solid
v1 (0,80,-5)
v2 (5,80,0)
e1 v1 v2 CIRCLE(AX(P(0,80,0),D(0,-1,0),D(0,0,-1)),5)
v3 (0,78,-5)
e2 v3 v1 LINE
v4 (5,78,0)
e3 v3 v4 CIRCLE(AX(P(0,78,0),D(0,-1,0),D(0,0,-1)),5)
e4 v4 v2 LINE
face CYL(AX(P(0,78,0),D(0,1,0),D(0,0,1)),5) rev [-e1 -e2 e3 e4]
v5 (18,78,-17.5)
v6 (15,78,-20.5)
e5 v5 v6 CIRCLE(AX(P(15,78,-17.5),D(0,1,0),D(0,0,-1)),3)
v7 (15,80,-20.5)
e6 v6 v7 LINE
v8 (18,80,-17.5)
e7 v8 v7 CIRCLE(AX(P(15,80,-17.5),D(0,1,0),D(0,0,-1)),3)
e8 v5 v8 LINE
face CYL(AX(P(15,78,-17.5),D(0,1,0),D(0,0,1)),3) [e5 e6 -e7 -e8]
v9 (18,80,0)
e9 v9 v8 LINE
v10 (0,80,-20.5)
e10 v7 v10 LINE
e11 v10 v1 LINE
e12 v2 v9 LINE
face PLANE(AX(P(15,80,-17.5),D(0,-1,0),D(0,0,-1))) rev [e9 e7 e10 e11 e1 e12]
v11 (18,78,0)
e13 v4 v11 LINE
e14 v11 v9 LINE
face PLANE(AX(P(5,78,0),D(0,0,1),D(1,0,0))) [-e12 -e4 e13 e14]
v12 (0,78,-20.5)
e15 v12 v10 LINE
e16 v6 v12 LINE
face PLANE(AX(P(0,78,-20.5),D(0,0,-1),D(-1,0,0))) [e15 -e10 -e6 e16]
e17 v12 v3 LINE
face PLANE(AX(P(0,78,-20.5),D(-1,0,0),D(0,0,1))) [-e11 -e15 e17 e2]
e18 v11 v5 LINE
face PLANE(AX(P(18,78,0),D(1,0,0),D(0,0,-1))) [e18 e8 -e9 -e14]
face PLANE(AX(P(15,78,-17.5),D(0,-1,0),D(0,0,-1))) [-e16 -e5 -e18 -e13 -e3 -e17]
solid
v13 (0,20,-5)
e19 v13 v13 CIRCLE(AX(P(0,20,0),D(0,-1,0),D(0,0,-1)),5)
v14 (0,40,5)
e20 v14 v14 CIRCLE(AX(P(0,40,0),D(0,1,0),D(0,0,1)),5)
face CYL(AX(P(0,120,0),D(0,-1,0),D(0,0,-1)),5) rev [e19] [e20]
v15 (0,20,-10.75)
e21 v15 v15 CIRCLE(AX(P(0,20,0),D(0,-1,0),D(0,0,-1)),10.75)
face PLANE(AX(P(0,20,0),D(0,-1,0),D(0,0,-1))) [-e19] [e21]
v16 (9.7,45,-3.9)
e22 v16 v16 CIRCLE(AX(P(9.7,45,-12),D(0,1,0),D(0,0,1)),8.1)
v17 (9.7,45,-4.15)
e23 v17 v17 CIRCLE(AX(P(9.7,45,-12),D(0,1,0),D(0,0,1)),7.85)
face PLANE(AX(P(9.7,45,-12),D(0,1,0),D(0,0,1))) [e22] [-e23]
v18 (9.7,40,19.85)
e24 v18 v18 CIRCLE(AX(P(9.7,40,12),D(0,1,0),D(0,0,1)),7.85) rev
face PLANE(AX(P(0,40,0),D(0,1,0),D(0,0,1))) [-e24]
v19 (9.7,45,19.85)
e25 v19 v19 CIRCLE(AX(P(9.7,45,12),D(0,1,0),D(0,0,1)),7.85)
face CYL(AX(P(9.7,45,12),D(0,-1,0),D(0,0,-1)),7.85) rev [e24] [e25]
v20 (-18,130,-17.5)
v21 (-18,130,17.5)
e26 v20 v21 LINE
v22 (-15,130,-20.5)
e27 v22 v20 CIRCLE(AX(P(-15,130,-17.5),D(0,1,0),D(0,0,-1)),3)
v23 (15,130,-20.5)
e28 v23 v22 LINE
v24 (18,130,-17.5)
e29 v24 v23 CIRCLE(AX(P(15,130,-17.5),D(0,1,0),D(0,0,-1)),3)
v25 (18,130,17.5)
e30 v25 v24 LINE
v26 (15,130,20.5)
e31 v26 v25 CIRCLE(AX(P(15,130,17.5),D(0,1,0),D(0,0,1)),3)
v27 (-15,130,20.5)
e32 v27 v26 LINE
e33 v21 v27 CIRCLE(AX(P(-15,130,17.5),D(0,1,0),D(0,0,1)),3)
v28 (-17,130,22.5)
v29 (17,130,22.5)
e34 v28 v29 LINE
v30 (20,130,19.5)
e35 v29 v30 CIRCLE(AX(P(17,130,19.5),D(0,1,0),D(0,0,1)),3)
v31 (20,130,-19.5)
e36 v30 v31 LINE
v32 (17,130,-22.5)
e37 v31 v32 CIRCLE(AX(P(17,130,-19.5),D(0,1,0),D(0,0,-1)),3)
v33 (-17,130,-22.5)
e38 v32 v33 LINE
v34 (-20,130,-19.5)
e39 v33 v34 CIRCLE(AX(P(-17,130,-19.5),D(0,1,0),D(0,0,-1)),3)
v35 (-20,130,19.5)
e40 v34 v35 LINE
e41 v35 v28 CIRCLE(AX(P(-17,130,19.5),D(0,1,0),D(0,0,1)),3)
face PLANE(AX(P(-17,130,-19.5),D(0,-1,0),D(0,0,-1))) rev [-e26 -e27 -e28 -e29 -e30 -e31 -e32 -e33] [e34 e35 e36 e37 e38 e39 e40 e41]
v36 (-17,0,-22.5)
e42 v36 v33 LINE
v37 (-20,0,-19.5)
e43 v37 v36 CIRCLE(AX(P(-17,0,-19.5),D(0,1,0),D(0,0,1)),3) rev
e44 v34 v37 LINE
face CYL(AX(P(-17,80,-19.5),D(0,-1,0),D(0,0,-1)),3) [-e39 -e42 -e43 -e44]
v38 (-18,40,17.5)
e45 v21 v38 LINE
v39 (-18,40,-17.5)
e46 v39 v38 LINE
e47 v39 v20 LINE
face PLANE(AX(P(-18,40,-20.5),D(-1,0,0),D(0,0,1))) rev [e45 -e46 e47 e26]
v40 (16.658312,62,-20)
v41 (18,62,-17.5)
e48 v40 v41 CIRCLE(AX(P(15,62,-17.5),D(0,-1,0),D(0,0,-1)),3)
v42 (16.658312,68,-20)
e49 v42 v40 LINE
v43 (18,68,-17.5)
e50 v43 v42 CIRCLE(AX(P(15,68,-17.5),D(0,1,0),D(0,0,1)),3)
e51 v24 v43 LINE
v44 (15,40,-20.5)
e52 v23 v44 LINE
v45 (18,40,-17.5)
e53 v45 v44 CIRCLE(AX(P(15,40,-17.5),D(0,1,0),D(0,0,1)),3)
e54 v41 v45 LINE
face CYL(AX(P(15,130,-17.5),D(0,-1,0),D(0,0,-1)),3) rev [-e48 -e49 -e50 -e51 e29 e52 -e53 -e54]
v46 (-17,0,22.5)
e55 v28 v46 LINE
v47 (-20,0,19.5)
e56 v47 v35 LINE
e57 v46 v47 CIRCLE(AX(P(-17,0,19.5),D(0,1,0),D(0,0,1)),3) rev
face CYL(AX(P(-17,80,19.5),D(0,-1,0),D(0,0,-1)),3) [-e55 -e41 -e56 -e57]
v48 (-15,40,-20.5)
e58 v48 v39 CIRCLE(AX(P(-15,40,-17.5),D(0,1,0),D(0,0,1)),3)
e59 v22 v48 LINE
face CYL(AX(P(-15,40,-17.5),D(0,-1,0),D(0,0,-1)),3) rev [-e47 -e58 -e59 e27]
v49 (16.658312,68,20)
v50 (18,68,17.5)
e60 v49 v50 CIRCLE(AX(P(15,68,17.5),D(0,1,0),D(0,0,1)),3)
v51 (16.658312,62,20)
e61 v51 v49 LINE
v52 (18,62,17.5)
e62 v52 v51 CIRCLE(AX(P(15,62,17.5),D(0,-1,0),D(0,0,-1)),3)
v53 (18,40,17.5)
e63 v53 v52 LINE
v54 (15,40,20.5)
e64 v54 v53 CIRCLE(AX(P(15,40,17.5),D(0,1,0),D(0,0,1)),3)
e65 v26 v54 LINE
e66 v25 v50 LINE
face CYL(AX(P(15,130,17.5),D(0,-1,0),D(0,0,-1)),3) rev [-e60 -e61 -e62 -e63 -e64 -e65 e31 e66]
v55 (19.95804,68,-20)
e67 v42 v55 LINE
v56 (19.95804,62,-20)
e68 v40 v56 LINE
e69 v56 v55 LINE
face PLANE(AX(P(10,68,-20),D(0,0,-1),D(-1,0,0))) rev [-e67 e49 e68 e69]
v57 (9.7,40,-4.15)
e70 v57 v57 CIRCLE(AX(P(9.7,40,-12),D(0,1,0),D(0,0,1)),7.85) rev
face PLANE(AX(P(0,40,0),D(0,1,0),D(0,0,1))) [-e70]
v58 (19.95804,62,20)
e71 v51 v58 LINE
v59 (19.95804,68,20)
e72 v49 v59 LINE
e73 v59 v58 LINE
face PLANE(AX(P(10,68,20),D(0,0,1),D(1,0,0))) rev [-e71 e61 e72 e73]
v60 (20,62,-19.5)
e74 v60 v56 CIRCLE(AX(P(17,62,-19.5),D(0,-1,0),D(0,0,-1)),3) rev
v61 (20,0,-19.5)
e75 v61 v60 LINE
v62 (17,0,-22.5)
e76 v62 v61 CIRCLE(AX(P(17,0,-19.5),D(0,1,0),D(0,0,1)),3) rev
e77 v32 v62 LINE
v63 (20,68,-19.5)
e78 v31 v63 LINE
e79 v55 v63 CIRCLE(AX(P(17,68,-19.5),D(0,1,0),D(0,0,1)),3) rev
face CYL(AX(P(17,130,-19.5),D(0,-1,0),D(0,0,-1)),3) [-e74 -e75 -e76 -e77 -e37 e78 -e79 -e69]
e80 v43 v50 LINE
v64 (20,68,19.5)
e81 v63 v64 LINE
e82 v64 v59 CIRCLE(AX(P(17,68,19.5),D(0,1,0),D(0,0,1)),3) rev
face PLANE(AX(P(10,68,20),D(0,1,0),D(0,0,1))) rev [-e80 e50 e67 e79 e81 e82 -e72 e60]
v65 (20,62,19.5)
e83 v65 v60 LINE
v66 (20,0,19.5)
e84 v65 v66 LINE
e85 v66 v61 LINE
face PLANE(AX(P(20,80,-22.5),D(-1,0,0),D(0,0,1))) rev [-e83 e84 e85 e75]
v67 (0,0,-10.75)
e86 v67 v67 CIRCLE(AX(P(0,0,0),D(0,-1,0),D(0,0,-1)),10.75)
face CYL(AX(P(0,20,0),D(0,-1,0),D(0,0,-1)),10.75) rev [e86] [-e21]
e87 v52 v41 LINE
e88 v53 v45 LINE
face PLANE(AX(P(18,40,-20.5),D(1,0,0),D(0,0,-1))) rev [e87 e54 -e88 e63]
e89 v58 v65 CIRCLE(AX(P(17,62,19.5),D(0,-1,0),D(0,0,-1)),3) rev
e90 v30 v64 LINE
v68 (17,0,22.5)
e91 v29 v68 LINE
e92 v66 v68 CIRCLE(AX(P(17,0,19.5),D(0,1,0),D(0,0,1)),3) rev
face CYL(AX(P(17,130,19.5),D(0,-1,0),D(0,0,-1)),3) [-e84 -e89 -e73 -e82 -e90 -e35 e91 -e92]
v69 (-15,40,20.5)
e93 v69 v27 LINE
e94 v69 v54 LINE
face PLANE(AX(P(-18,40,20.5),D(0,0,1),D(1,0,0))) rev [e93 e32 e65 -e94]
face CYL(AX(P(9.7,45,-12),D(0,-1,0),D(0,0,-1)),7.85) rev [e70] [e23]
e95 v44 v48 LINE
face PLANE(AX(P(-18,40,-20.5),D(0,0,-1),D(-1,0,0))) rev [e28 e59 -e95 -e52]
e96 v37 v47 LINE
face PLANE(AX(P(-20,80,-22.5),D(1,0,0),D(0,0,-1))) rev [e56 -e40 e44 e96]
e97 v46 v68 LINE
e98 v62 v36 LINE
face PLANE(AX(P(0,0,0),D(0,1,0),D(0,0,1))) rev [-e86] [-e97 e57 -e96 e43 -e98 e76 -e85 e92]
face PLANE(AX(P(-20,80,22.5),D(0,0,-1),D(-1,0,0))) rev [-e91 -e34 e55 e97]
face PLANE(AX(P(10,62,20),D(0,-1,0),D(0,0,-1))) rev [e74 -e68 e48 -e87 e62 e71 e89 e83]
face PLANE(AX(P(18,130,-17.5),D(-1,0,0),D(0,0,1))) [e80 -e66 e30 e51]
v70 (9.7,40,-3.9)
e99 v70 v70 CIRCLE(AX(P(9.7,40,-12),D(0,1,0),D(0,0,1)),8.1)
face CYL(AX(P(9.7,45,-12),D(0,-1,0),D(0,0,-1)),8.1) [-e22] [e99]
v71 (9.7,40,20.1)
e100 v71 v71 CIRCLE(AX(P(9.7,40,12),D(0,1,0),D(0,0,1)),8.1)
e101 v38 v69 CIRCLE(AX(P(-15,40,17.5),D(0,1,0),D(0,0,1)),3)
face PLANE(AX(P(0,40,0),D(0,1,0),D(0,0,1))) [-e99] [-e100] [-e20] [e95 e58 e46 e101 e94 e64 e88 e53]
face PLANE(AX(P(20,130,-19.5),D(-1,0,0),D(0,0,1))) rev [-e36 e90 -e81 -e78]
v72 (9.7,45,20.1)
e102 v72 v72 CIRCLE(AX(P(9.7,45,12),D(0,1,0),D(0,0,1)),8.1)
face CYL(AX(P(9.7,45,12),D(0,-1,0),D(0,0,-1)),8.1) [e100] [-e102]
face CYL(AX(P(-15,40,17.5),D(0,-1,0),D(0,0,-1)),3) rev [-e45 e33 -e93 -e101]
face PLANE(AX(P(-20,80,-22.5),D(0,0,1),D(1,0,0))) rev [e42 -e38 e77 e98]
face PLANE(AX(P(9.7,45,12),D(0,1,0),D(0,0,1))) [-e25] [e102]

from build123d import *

# Parameters (mm, degrees)
SKETCH2_W              = 40
SKETCH2_H              = 45
BOSS_EXTRUDE1_DEPTH    = 80
SKETCH3_R              = 10.75
CUT_EXTRUDE1_DEPTH     = 20
SKETCH5_W              = 36
SKETCH5_H              = 41
CUT_EXTRUDE2_DEPTH     = 40
SKETCH6_R              = 5
CUT_EXTRUDE3_DEPTH     = 100
SKETCH7_W              = 40
SKETCH7_H              = 6
CUT_EXTRUDE4_DEPTH     = 10
FILLET1_R              = 3
FILLET2_R              = 3
FILLET3_R              = 3
FILLET4_R              = 3
FILLET5_R              = 3
FILLET6_R              = 3
SPLIT1_SURFACE_1_BACK  = 101.125
SPLIT1_SURFACE_1_DEPTH = 202.25
SPLIT1_SURFACE_2_BACK  = 101.125
SPLIT1_SURFACE_2_DEPTH = 202.25
SKETCH10_R             = 8.1
SKETCH10_R_2           = 7.85
BOSS_EXTRUDE2_DEPTH    = 5
BOSS_EXTRUDE6_DEPTH    = 2
BOSS_EXTRUDE3_DEPTH    = 50


with BuildPart() as part:
    # Sketch2 → Boss-Extrude1 (new body)
    with BuildSketch(Plane(origin=(0, 0, 0), x_dir=(1, 0, 0), z_dir=(0, 1, 0))):
        Rectangle(SKETCH2_W, SKETCH2_H)
    extrude(amount=BOSS_EXTRUDE1_DEPTH)

    # Sketch3 → Cut-Extrude1 (cut)
    with BuildSketch(Plane.XZ):
        with Locations(Location((0, 0, 0), (0, 0, 270))):
            Circle(SKETCH3_R)
    extrude(amount=-CUT_EXTRUDE1_DEPTH, mode=Mode.SUBTRACT)

    # Sketch5 → Cut-Extrude2 (cut)
    with BuildSketch(Plane(origin=(0, 80, 0), x_dir=(1, 0, 0), z_dir=(0, 1, 0))):
        Rectangle(SKETCH5_W, SKETCH5_H)
    extrude(amount=-CUT_EXTRUDE2_DEPTH, mode=Mode.SUBTRACT)

    # Sketch6 → Cut-Extrude3 (cut)
    with BuildSketch(Plane.XZ.offset(-20)):
        with Locations(Location((0, 0, 0), (0, 0, 270))):
            Circle(SKETCH6_R)
    extrude(amount=-CUT_EXTRUDE3_DEPTH, mode=Mode.SUBTRACT)

    # Sketch7 → Cut-Extrude4 (cut)
    with BuildSketch(Plane(origin=(20, 0, 0), x_dir=(0, 0, -1), z_dir=(1, 0, 0))):
        with Locations((0, 65)):
            Rectangle(SKETCH7_W, SKETCH7_H)
    extrude(amount=-CUT_EXTRUDE4_DEPTH, mode=Mode.SUBTRACT)

    # Fillet1
    # the kernel refuses this fillet: 3 mm, written as the material it takes off along each edge
    with BuildSketch(Plane(origin=(20, -7.5, 22.5), x_dir=(0, 0, -1), z_dir=(0, 1, 0)), Plane(origin=(20, -7.5, -22.5), x_dir=(-1, 0, 0), z_dir=(0, 1, 0))) as fillet1_piece_1:
        with BuildLine():
            CenterArc((FILLET1_R, FILLET1_R), FILLET1_R, 180, 90)
            Line((0, FILLET1_R), (0, 0))
            Line((0, 0), (FILLET1_R, 0))
        make_face()
    extrude(amount=95, mode=Mode.SUBTRACT)

    # Fillet2
    fillet2_edges = [part.edges().sort_by_distance(p)[0] for p in [
        (-20, 40, 22.5),
        (-20, 40, -22.5),
    ]]
    fillet(fillet2_edges, radius=FILLET2_R)

    # Fillet3
    fillet3_edges = [part.edges().sort_by_distance(p)[0] for p in [
        (-18, 60, -20.5),
    ]]
    fillet(fillet3_edges, radius=FILLET3_R)

    # Fillet4
    # the kernel refuses this fillet: 3 mm, written as the material it adds along each edge
    with BuildSketch(Plane(origin=(18, 80, -20.5), x_dir=(-1, 0, 0), z_dir=(0, -1, 0))) as fillet4_piece_1_section:
        with BuildLine():
            CenterArc((FILLET4_R, -FILLET4_R), FILLET4_R, 90, 90)
            Line((0, -FILLET4_R), (0, 0))
            Line((0, 0), (FILLET4_R, 0))
        make_face()
    fillet4_piece_1 = extrude(amount=47.5, mode=Mode.PRIVATE)
    fillet4_piece_1 = split(fillet4_piece_1, bisect_by=Plane(origin=(17.022641749, 74, -20), z_dir=(0, 0, -1)), keep=Keep.TOP, mode=Mode.PRIVATE)
    add(fillet4_piece_1)
    with BuildSketch(Plane(origin=(18, 80, -20.5), x_dir=(-1, 0, 0), z_dir=(0, -1, 0))) as fillet4_piece_2_section:
        with BuildLine():
            CenterArc((FILLET4_R, -FILLET4_R), FILLET4_R, 90, 90)
            Line((0, -FILLET4_R), (0, 0))
            Line((0, 0), (FILLET4_R, 0))
        make_face()
    fillet4_piece_2 = extrude(amount=47.5, mode=Mode.PRIVATE)
    fillet4_piece_2 = split(fillet4_piece_2, bisect_by=Plane(origin=(17.619593503, 68, -19.406346205), z_dir=(0, 1, 0)), keep=Keep.TOP, mode=Mode.PRIVATE)
    add(fillet4_piece_2)
    with BuildSketch(Plane(origin=(18, 87.5, -20.5), x_dir=(-1, 0, 0), z_dir=(0, -1, 0))) as fillet4_piece_3_section:
        with BuildLine():
            CenterArc((FILLET4_R, -FILLET4_R), FILLET4_R, 90, 90)
            Line((0, -FILLET4_R), (0, 0))
            Line((0, 0), (FILLET4_R, 0))
        make_face()
    fillet4_piece_3 = extrude(amount=55, mode=Mode.PRIVATE)
    fillet4_piece_3 = split(fillet4_piece_3, bisect_by=Plane(origin=(17.619593503, 62, -19.406346205), z_dir=(0, -1, 0)), keep=Keep.TOP, mode=Mode.PRIVATE)
    add(fillet4_piece_3)

    # Fillet5
    fillet5_edges = [part.edges().sort_by_distance(p)[0] for p in [
        (-18, 60, 20.5),
    ]]
    fillet(fillet5_edges, radius=FILLET5_R)

    # Fillet6
    # the kernel refuses this fillet: 3 mm, written as the material it adds along each edge
    with BuildSketch(Plane(origin=(18, 80, 20.5), x_dir=(-1, 0, 0), z_dir=(0, -1, 0))) as fillet6_piece_1_section:
        with BuildLine():
            CenterArc((FILLET6_R, FILLET6_R), FILLET6_R, 180, 90)
            Line((0, FILLET6_R), (0, 0))
            Line((0, 0), (FILLET6_R, 0))
        make_face()
    fillet6_piece_1 = extrude(amount=47.5, mode=Mode.PRIVATE)
    fillet6_piece_1 = split(fillet6_piece_1, bisect_by=Plane(origin=(17.022641749, 74, 20), z_dir=(0, 0, 1)), keep=Keep.TOP, mode=Mode.PRIVATE)
    add(fillet6_piece_1)
    with BuildSketch(Plane(origin=(18, 80, 20.5), x_dir=(-1, 0, 0), z_dir=(0, -1, 0))) as fillet6_piece_2_section:
        with BuildLine():
            CenterArc((FILLET6_R, FILLET6_R), FILLET6_R, 180, 90)
            Line((0, FILLET6_R), (0, 0))
            Line((0, 0), (FILLET6_R, 0))
        make_face()
    fillet6_piece_2 = extrude(amount=47.5, mode=Mode.PRIVATE)
    fillet6_piece_2 = split(fillet6_piece_2, bisect_by=Plane(origin=(17.619593503, 68, 19.406346205), z_dir=(0, 1, 0)), keep=Keep.TOP, mode=Mode.PRIVATE)
    add(fillet6_piece_2)
    with BuildSketch(Plane(origin=(18, 87.5, 20.5), x_dir=(-1, 0, 0), z_dir=(0, -1, 0))) as fillet6_piece_3_section:
        with BuildLine():
            CenterArc((FILLET6_R, FILLET6_R), FILLET6_R, 180, 90)
            Line((0, FILLET6_R), (0, 0))
            Line((0, 0), (FILLET6_R, 0))
        make_face()
    fillet6_piece_3 = extrude(amount=55, mode=Mode.PRIVATE)
    fillet6_piece_3 = split(fillet6_piece_3, bisect_by=Plane(origin=(17.619593503, 62, 19.406346205), z_dir=(0, -1, 0)), keep=Keep.TOP, mode=Mode.PRIVATE)
    add(fillet6_piece_3)


with BuildPart() as body_2:
    # Split1: the piece behind the surface
    add(part.part)
    # Split1 surface: a surface, the sketch's curves swept straight by 202.25 mm
    with BuildLine(Plane(origin=(0, 80, 0), x_dir=(1, 0, 0), z_dir=(0, 1, 0)).offset(-SPLIT1_SURFACE_1_BACK), mode=Mode.PRIVATE) as split1_surface_1_path:
        Line((0, 22.5), (0, 0))
        Line((0, 0), (0, -22.5))
    split1_surface_1 = Shell.extrude(split1_surface_1_path.wire(), (0 * SPLIT1_SURFACE_1_DEPTH, 1 * SPLIT1_SURFACE_1_DEPTH, 0 * SPLIT1_SURFACE_1_DEPTH))
    split(bisect_by=split1_surface_1, keep=Keep.BOTTOM)


with BuildPart() as part_1:
    add(part.part)

    # Split1: split by a surface, the side it looks to stays
    # Split1 surface: a surface, the sketch's curves swept straight by 202.25 mm
    with BuildLine(Plane(origin=(0, 80, 0), x_dir=(1, 0, 0), z_dir=(0, 1, 0)).offset(-SPLIT1_SURFACE_2_BACK), mode=Mode.PRIVATE) as split1_surface_2_path:
        Line((0, 22.5), (0, 0))
        Line((0, 0), (0, -22.5))
    split1_surface_2 = Shell.extrude(split1_surface_2_path.wire(), (0 * SPLIT1_SURFACE_2_DEPTH, 1 * SPLIT1_SURFACE_2_DEPTH, 0 * SPLIT1_SURFACE_2_DEPTH))
    split(bisect_by=split1_surface_2, keep=Keep.TOP)

    # Sketch10 → Boss-Extrude2 (add)
    # profile 1 of 2: a face of its own
    with BuildSketch(Plane(origin=(0, 40, 0), x_dir=(1, 0, 0), z_dir=(0, 1, 0))):
        with Locations(Location((9.7, 12, 0), (0, 0, 270))):
            Circle(SKETCH10_R)
        with Locations(Location((9.7, 12, 0), (0, 0, 270))):
            Circle(SKETCH10_R_2, mode=Mode.SUBTRACT)
    # profile 2 of 2: a face of its own
    with BuildSketch(Plane(origin=(0, 40, 0), x_dir=(1, 0, 0), z_dir=(0, 1, 0))):
        with Locations(Location((9.7, -12, 0), (0, 0, 270))):
            Circle(SKETCH10_R)
        with Locations(Location((9.7, -12, 0), (0, 0, 270))):
            Circle(SKETCH10_R_2, mode=Mode.SUBTRACT)
    extrude(amount=BOSS_EXTRUDE2_DEPTH)

    add(body_2.part)  # Boss-Extrude3 merges body 2
    # Sketch11 → Boss-Extrude3 (add)
    with BuildSketch(Plane(origin=(0, 80, 0), x_dir=(1, 0, 0), z_dir=(0, 1, 0))):
        with BuildLine():
            Line((-20, 19.5), (-20, -19.5))
            ThreePointArc((-20, -19.5), (-19.121320344, -21.621320344), (-17, -22.5))
            Line((-17, -22.5), (17, -22.5))
            ThreePointArc((17, -22.5), (19.121320344, -21.621320344), (20, -19.5))
            Line((20, -19.5), (20, 19.5))
            ThreePointArc((20, 19.5), (19.121320344, 21.621320344), (17, 22.5))
            Line((17, 22.5), (-17, 22.5))
            ThreePointArc((-17, 22.5), (-19.121320344, 21.621320344), (-20, 19.5))
        make_face()
        with BuildLine():
            Line((-18, 17.5), (-18, -17.5))
            ThreePointArc((-18, -17.5), (-17.121320344, -19.621320344), (-15, -20.5))
            Line((-15, -20.5), (15, -20.5))
            ThreePointArc((15, -20.5), (17.121320344, -19.621320344), (18, -17.5))
            Line((18, -17.5), (18, 17.5))
            ThreePointArc((18, 17.5), (17.121320344, 19.621320344), (15, 20.5))
            Line((15, 20.5), (-15, 20.5))
            ThreePointArc((-15, 20.5), (-17.121320344, 19.621320344), (-18, 17.5))
        make_face(mode=Mode.SUBTRACT)
    extrude(amount=BOSS_EXTRUDE3_DEPTH)


with BuildPart() as body_3:
    # Sketch15 → Boss-Extrude6 (new body)
    with BuildSketch(Plane(origin=(0, 80, 0), x_dir=(1, 0, 0), z_dir=(0, 1, 0))):
        with BuildLine():
            Line((0, 20.5), (0, 5))
            ThreePointArc((0, 5), (3.535533906, 3.535533906), (5, 0))
            Line((5, 0), (18, 0))
            Line((18, 0), (18, 17.5))
            ThreePointArc((18, 17.5), (17.121320344, 19.621320344), (15, 20.5))
            Line((15, 20.5), (0, 20.5))
        make_face()
    extrude(amount=-BOSS_EXTRUDE6_DEPTH)


solid = Compound([part_1.part, body_3.part])
